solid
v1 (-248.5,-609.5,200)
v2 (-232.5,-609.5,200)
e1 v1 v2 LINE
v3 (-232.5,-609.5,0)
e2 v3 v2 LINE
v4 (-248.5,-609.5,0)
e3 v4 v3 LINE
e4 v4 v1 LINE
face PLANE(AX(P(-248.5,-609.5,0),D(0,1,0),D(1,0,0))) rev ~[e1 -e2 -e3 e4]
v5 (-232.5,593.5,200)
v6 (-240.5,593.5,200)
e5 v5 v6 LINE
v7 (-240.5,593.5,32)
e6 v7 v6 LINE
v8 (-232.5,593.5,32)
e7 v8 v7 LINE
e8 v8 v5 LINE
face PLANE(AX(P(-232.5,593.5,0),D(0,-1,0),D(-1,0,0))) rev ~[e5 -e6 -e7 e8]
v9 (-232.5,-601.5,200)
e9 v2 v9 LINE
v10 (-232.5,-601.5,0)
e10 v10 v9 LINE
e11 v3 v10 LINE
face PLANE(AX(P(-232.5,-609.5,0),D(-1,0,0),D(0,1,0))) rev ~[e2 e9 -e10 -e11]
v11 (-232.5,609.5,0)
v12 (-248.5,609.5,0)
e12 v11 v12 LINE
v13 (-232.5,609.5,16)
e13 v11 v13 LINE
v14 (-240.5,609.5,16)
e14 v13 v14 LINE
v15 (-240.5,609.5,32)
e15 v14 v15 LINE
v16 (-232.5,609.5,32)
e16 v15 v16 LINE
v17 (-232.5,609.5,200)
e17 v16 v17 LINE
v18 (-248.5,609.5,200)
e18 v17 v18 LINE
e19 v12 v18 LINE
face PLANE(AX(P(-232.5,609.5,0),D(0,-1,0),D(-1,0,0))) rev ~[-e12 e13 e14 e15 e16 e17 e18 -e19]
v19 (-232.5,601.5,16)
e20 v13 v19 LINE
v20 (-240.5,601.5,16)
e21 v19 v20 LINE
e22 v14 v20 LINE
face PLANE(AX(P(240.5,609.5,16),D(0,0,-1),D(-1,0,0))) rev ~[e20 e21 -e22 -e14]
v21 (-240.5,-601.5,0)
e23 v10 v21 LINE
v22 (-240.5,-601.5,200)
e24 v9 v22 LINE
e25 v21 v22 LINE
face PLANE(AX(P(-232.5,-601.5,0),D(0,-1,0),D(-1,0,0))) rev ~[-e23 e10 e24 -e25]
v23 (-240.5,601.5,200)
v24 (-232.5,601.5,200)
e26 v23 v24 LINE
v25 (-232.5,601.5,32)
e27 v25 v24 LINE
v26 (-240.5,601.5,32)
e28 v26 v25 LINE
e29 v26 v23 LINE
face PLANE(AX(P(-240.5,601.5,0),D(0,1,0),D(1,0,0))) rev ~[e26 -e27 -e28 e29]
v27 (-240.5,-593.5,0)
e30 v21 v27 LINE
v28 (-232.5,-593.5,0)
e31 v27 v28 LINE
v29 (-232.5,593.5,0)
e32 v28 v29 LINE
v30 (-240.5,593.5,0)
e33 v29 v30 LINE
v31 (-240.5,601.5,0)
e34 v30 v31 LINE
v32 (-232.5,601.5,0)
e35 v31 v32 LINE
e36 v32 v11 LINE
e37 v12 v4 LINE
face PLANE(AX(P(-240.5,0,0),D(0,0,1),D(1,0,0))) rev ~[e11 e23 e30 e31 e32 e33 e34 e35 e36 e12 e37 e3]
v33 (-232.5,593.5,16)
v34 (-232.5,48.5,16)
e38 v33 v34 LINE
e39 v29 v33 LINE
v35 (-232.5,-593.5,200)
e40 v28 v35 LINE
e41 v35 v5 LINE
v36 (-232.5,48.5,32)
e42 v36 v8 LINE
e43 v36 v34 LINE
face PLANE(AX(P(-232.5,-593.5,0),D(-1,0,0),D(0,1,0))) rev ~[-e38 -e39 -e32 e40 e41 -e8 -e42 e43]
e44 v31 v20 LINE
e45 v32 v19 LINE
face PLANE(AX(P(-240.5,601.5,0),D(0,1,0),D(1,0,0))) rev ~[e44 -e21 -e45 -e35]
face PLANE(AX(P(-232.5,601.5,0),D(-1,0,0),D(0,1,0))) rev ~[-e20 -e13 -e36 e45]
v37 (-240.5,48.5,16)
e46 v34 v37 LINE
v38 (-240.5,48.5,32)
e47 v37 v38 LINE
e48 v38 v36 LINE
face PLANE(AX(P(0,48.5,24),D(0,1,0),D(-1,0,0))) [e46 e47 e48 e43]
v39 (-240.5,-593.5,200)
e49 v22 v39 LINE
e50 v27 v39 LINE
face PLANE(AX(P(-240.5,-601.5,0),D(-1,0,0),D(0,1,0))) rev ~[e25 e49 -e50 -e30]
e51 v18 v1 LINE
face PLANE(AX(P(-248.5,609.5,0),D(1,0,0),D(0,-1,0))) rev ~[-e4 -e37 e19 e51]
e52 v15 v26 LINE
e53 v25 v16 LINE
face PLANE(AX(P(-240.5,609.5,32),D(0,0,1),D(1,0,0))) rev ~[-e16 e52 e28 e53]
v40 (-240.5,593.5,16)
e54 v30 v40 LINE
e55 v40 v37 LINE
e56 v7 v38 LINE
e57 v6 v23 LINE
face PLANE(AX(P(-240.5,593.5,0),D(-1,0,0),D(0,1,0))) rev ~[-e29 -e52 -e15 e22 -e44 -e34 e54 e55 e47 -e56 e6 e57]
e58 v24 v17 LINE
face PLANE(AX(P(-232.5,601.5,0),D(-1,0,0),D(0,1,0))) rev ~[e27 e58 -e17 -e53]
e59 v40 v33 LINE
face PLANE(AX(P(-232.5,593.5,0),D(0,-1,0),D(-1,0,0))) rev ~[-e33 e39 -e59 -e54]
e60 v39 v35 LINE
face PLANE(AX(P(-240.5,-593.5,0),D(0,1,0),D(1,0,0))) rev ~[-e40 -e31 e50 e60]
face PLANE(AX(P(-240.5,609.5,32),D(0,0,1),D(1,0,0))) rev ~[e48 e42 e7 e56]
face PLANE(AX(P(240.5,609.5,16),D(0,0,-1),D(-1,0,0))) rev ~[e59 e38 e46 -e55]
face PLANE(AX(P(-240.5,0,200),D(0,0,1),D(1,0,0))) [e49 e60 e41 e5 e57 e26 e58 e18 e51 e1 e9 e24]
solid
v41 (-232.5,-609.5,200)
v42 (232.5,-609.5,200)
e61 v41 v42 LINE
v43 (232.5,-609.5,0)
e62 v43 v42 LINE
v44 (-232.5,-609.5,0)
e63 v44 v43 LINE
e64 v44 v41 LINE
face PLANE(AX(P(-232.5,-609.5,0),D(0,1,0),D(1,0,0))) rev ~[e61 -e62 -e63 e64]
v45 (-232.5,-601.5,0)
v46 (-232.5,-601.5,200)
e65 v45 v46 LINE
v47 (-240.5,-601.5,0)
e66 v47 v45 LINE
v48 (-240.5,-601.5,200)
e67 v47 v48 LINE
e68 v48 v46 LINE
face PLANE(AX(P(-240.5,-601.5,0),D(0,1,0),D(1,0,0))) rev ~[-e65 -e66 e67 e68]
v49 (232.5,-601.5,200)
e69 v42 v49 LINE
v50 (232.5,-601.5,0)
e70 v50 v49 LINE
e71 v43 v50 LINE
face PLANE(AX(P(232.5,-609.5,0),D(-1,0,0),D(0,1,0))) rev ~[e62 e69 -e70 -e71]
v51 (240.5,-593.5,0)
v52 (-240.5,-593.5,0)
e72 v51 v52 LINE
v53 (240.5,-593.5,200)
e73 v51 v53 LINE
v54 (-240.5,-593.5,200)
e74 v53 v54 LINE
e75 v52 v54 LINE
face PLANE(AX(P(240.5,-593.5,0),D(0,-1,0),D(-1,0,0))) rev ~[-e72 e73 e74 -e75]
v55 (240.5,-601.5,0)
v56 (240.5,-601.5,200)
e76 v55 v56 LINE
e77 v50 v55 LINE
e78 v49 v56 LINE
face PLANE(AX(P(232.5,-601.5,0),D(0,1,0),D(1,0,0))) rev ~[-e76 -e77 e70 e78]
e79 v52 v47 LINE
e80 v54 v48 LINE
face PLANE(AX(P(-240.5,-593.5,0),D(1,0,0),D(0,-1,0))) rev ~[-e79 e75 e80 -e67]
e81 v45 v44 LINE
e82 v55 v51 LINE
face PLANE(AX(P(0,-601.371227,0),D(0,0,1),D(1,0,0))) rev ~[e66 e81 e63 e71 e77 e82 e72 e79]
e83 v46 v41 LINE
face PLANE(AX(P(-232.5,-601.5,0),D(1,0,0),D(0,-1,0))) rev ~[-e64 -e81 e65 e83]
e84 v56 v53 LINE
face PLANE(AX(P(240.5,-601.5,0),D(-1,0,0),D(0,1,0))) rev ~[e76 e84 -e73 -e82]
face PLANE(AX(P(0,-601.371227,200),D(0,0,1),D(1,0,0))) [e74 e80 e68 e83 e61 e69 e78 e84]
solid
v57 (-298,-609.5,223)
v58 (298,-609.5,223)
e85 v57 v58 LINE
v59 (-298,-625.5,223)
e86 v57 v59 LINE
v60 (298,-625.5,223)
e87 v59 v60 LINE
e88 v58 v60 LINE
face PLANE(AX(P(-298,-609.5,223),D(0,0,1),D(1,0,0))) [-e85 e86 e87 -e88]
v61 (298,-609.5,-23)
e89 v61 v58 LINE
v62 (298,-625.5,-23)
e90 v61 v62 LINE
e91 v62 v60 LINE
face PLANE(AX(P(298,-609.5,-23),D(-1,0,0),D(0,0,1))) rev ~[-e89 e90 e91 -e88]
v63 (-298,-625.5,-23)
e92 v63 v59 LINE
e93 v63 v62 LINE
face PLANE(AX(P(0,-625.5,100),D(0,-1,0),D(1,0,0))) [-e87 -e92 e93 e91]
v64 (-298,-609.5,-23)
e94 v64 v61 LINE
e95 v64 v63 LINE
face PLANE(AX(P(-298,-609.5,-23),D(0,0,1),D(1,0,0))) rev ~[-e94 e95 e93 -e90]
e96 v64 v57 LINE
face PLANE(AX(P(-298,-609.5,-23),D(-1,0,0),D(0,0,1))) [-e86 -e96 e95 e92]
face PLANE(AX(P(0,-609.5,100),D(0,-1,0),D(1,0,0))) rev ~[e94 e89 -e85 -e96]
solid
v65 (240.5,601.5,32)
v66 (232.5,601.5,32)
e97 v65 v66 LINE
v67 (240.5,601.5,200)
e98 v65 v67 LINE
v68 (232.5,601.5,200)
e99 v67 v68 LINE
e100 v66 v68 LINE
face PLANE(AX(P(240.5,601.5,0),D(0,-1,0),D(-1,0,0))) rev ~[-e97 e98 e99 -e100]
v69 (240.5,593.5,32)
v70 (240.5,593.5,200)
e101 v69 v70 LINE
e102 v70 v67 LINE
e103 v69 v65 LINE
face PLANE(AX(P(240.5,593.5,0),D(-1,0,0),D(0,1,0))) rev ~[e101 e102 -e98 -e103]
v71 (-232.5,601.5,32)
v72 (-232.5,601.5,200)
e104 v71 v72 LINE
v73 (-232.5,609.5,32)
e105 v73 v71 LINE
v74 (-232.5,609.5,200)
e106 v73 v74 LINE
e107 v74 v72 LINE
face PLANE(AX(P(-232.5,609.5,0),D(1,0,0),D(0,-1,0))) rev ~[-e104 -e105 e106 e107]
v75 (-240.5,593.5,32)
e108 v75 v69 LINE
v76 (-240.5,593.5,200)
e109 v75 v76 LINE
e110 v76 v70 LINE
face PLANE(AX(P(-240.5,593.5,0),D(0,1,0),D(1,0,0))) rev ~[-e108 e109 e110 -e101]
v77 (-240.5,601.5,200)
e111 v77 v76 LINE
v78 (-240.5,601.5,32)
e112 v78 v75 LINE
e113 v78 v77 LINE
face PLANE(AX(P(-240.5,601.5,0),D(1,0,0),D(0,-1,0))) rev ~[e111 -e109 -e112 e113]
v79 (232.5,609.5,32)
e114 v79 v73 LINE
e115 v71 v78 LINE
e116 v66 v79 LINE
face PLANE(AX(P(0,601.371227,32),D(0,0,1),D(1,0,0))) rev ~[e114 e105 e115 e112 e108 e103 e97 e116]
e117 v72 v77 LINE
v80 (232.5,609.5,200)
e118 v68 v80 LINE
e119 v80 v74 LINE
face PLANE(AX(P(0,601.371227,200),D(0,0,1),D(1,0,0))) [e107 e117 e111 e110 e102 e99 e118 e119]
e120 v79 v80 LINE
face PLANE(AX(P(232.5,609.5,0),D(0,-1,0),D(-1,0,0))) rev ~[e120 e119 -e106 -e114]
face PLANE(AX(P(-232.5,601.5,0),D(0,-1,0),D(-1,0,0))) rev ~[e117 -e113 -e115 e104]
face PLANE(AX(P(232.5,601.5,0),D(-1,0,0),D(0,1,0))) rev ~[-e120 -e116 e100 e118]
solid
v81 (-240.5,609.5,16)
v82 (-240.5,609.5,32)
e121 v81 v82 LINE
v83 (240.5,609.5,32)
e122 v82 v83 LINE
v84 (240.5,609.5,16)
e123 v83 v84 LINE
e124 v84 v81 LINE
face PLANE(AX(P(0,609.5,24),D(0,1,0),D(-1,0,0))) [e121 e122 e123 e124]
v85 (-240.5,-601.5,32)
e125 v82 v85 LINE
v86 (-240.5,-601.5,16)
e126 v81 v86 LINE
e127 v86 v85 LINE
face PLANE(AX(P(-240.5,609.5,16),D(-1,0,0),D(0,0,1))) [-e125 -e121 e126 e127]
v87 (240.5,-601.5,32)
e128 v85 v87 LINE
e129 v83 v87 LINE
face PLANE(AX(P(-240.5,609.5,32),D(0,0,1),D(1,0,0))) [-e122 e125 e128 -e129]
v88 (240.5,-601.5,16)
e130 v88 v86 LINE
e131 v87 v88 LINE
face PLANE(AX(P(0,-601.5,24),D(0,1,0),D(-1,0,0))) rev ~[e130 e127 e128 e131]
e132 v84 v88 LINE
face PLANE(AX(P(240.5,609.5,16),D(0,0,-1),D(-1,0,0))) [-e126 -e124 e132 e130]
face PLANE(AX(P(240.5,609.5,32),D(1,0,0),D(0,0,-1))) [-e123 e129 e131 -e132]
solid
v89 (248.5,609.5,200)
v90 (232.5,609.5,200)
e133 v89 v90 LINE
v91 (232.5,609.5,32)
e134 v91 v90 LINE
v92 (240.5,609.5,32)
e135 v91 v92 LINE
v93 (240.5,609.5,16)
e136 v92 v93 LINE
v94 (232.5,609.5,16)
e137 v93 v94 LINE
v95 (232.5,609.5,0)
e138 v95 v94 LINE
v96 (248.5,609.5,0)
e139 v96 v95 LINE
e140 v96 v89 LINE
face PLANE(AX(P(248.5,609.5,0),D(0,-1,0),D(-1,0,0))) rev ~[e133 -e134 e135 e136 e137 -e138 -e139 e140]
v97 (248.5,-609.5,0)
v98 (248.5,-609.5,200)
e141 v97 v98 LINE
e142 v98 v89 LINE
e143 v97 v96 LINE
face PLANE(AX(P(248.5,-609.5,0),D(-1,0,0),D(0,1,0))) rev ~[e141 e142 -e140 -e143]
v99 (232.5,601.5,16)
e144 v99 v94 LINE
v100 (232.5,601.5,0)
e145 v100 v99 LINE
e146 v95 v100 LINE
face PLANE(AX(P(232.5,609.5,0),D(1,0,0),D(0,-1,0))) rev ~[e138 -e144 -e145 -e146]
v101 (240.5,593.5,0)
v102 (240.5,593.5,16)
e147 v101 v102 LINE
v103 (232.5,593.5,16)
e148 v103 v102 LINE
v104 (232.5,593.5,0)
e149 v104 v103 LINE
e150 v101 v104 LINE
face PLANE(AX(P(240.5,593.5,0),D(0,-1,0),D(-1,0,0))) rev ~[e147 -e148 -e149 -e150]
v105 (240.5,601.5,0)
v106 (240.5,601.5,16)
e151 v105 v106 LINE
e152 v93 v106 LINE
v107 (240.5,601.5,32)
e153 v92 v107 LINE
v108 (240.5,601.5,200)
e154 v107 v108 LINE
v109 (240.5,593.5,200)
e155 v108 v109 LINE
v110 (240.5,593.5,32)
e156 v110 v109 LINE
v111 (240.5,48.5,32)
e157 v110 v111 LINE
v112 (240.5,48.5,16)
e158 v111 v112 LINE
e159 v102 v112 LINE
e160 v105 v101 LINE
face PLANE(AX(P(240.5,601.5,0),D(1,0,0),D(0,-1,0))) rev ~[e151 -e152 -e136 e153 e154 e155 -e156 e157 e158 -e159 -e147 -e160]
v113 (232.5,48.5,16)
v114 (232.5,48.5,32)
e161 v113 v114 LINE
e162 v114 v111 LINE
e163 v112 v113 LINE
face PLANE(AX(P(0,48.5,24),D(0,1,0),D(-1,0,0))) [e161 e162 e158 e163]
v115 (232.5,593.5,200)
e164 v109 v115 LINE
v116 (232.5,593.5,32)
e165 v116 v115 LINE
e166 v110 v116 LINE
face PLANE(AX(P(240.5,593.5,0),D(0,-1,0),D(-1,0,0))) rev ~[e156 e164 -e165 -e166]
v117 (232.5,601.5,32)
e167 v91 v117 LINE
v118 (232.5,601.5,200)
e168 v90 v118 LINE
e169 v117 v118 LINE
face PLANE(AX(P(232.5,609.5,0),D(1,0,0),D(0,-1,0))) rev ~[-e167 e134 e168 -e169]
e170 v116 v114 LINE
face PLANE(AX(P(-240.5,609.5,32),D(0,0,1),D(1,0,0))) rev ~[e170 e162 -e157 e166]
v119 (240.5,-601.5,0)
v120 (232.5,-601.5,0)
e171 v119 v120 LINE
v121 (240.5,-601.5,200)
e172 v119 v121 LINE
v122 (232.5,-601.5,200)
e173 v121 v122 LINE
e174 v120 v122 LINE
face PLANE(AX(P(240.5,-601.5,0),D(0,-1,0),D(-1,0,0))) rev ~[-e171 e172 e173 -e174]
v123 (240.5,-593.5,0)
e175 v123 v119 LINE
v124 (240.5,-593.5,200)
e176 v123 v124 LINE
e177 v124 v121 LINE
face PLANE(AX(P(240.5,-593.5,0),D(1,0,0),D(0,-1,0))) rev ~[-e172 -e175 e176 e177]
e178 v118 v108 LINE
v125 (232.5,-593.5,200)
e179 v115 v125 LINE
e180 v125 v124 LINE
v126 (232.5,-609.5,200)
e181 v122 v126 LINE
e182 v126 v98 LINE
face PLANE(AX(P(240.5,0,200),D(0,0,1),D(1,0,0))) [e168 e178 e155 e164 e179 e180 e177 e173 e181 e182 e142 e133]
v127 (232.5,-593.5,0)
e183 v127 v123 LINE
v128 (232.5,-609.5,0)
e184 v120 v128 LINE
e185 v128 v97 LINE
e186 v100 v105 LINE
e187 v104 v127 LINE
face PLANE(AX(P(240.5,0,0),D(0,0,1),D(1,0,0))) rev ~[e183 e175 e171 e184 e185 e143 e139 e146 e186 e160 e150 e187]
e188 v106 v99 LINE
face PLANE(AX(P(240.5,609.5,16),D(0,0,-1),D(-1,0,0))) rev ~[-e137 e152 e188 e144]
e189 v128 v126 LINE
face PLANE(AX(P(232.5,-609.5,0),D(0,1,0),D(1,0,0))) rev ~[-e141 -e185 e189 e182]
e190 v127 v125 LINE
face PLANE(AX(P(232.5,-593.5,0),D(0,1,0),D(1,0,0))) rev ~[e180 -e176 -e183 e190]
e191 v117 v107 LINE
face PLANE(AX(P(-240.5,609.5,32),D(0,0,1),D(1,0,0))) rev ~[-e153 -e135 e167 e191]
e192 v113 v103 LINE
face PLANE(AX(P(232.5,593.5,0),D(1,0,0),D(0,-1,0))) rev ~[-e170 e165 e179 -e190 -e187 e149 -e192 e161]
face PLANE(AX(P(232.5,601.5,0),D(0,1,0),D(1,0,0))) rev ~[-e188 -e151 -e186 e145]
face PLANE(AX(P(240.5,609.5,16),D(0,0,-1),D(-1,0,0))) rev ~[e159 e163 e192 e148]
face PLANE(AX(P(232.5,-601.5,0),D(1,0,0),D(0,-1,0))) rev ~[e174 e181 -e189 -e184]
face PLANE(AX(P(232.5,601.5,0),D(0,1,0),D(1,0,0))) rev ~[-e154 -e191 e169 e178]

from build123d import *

# Parameters (mm, degrees)
F1_DEPTH  = 200
F2_DEPTH  = 200
F3_DEPTH  = 200
F4_DEPTH  = 200
F5_DEPTH  = 32
F7_DEPTH  = 561
F9_DEPTH  = 1211
F10_W     = 596
F10_H     = 246
F10_W_2   = 465.0000002384
F10_H_2   = 200
F10_W_3   = 16
F10_W_4   = 15.9999997616
F11_DEPTH = 16


with BuildPart() as f1:
    # F0 (on Top) → F1 (new body)
    with BuildSketch(Plane.XY):
        Polygon((-248.5, -609.5), (-232.5000002384, -609.5), (-232.5000002384, -601.5000002384), (-240.5000002384, -601.5000002384), (-240.5000002384, -593.5000002384), (-232.5000002384, -593.5000002384), (-232.5000002384, 593.5000002384), (-240.5000002384, 593.5000002384), (-240.5000002384, 601.5000002384), (-232.5000002384, 601.5000002384), (-232.5000002384, 609.5), (-248.5, 609.5), align=None)
    extrude(amount=F1_DEPTH)


with BuildPart() as f2:
    # F0 (on Top) → F2 (new body)
    with BuildSketch(Plane.XY):
        Polygon((232.5, -609.5), (248.5, -609.5), (248.5, 609.5), (232.5, 609.5), (232.5, 601.5000002384), (240.5, 601.5000002384), (240.5, 593.5000002384), (232.5, 593.5000002384), (232.5, -593.5000002384), (240.5, -593.5000002384), (240.5, -601.5000002384), (232.5, -601.5000002384), align=None)
    extrude(amount=F2_DEPTH)


with BuildPart() as f3:
    # F0 (on Top) → F3 (new body)
    with BuildSketch(Plane.XY):
        Polygon((232.5, 601.5000002384), (232.5, 609.5), (-232.5000002384, 609.5), (-232.5000002384, 601.5000002384), (-240.5000002384, 601.5000002384), (-240.5000002384, 593.5000002384), (-232.5000002384, 593.5000002384), (232.5, 593.5000002384), (240.5, 593.5000002384), (240.5, 601.5000002384), align=None)
    extrude(amount=F3_DEPTH)

    # F0 (on Top) → F5 (cut)
    with BuildSketch(Plane.XY):
        Polygon((232.5, 601.5000002384), (232.5, 609.5), (-232.5000002384, 609.5), (-232.5000002384, 601.5000002384), (-240.5000002384, 601.5000002384), (-240.5000002384, 593.5000002384), (-232.5000002384, 593.5000002384), (232.5, 593.5000002384), (240.5, 593.5000002384), (240.5, 601.5000002384), align=None)
    extrude(amount=F5_DEPTH, mode=Mode.SUBTRACT)


with BuildPart() as f4:
    # F0 (on Top) → F4 (new body)
    with BuildSketch(Plane.XY):
        Polygon((-232.5000002384, -609.5), (232.5, -609.5), (232.5, -601.5000002384), (240.5, -601.5000002384), (240.5, -593.5000002384), (232.5, -593.5000002384), (-232.5000002384, -593.5000002384), (-240.5000002384, -593.5000002384), (-240.5000002384, -601.5000002384), (-232.5000002384, -601.5000002384), align=None)
    extrude(amount=F4_DEPTH)


with BuildPart() as f7:
    # F6 (on face) → F7 (new body)
    with BuildSketch(Plane(origin=(0, 609.5, 0), x_dir=(-1, 0, 0), z_dir=(0, 1, 0))):
        Polygon((-232.5, 32), (-240.5, 32), (-240.5, 16), (240.5000002384, 16), (240.5000002384, 32), (232.5000002384, 32), align=None)
    extrude(amount=-F7_DEPTH)


with BuildPart() as f2_1:
    add(f2.part)

    # F8: cut F7
    add(f7.part, mode=Mode.SUBTRACT)


with BuildPart() as f1_1:
    add(f1.part)

    # F8: cut F7
    add(f7.part, mode=Mode.SUBTRACT)


with BuildPart() as f4_1:
    add(f4.part)

    # F8: cut F7
    add(f7.part, mode=Mode.SUBTRACT)


with BuildPart() as f9:
    # F6 (on face) → F9 (new body)
    with BuildSketch(Plane(origin=(0, 609.5, 0), x_dir=(-1, 0, 0), z_dir=(0, 1, 0))):
        Polygon((-232.5, 32), (-240.5, 32), (-240.5, 16), (240.5000002384, 16), (240.5000002384, 32), (232.5000002384, 32), align=None)
    extrude(amount=-F9_DEPTH)


with BuildPart() as f11:
    # F10 (on face) → F11 (new body)
    with BuildSketch(Plane.XZ.offset(609.5)):
        with Locations((0, 100)):
            Rectangle(F10_W, F10_H)
        Polygon((-248.5, 0), (-248.5, 200), (-232.5000002384, 200), (232.5, 200), (248.5, 200), (248.5, 0), (232.5, 0), (-232.5000002384, 0), align=None, mode=Mode.SUBTRACT)
        with Locations((-1.192e-07, 100)):
            Rectangle(F10_W_2, F10_H_2)
        with Locations((240.5, 100)):
            Rectangle(F10_W_3, F10_H_2)
        with Locations((-240.5000001192, 100)):
            Rectangle(F10_W_4, F10_H_2)
    extrude(amount=F11_DEPTH)


solid = Compound([f3.part, f2_1.part, f1_1.part, f4_1.part, f9.part, f11.part])
